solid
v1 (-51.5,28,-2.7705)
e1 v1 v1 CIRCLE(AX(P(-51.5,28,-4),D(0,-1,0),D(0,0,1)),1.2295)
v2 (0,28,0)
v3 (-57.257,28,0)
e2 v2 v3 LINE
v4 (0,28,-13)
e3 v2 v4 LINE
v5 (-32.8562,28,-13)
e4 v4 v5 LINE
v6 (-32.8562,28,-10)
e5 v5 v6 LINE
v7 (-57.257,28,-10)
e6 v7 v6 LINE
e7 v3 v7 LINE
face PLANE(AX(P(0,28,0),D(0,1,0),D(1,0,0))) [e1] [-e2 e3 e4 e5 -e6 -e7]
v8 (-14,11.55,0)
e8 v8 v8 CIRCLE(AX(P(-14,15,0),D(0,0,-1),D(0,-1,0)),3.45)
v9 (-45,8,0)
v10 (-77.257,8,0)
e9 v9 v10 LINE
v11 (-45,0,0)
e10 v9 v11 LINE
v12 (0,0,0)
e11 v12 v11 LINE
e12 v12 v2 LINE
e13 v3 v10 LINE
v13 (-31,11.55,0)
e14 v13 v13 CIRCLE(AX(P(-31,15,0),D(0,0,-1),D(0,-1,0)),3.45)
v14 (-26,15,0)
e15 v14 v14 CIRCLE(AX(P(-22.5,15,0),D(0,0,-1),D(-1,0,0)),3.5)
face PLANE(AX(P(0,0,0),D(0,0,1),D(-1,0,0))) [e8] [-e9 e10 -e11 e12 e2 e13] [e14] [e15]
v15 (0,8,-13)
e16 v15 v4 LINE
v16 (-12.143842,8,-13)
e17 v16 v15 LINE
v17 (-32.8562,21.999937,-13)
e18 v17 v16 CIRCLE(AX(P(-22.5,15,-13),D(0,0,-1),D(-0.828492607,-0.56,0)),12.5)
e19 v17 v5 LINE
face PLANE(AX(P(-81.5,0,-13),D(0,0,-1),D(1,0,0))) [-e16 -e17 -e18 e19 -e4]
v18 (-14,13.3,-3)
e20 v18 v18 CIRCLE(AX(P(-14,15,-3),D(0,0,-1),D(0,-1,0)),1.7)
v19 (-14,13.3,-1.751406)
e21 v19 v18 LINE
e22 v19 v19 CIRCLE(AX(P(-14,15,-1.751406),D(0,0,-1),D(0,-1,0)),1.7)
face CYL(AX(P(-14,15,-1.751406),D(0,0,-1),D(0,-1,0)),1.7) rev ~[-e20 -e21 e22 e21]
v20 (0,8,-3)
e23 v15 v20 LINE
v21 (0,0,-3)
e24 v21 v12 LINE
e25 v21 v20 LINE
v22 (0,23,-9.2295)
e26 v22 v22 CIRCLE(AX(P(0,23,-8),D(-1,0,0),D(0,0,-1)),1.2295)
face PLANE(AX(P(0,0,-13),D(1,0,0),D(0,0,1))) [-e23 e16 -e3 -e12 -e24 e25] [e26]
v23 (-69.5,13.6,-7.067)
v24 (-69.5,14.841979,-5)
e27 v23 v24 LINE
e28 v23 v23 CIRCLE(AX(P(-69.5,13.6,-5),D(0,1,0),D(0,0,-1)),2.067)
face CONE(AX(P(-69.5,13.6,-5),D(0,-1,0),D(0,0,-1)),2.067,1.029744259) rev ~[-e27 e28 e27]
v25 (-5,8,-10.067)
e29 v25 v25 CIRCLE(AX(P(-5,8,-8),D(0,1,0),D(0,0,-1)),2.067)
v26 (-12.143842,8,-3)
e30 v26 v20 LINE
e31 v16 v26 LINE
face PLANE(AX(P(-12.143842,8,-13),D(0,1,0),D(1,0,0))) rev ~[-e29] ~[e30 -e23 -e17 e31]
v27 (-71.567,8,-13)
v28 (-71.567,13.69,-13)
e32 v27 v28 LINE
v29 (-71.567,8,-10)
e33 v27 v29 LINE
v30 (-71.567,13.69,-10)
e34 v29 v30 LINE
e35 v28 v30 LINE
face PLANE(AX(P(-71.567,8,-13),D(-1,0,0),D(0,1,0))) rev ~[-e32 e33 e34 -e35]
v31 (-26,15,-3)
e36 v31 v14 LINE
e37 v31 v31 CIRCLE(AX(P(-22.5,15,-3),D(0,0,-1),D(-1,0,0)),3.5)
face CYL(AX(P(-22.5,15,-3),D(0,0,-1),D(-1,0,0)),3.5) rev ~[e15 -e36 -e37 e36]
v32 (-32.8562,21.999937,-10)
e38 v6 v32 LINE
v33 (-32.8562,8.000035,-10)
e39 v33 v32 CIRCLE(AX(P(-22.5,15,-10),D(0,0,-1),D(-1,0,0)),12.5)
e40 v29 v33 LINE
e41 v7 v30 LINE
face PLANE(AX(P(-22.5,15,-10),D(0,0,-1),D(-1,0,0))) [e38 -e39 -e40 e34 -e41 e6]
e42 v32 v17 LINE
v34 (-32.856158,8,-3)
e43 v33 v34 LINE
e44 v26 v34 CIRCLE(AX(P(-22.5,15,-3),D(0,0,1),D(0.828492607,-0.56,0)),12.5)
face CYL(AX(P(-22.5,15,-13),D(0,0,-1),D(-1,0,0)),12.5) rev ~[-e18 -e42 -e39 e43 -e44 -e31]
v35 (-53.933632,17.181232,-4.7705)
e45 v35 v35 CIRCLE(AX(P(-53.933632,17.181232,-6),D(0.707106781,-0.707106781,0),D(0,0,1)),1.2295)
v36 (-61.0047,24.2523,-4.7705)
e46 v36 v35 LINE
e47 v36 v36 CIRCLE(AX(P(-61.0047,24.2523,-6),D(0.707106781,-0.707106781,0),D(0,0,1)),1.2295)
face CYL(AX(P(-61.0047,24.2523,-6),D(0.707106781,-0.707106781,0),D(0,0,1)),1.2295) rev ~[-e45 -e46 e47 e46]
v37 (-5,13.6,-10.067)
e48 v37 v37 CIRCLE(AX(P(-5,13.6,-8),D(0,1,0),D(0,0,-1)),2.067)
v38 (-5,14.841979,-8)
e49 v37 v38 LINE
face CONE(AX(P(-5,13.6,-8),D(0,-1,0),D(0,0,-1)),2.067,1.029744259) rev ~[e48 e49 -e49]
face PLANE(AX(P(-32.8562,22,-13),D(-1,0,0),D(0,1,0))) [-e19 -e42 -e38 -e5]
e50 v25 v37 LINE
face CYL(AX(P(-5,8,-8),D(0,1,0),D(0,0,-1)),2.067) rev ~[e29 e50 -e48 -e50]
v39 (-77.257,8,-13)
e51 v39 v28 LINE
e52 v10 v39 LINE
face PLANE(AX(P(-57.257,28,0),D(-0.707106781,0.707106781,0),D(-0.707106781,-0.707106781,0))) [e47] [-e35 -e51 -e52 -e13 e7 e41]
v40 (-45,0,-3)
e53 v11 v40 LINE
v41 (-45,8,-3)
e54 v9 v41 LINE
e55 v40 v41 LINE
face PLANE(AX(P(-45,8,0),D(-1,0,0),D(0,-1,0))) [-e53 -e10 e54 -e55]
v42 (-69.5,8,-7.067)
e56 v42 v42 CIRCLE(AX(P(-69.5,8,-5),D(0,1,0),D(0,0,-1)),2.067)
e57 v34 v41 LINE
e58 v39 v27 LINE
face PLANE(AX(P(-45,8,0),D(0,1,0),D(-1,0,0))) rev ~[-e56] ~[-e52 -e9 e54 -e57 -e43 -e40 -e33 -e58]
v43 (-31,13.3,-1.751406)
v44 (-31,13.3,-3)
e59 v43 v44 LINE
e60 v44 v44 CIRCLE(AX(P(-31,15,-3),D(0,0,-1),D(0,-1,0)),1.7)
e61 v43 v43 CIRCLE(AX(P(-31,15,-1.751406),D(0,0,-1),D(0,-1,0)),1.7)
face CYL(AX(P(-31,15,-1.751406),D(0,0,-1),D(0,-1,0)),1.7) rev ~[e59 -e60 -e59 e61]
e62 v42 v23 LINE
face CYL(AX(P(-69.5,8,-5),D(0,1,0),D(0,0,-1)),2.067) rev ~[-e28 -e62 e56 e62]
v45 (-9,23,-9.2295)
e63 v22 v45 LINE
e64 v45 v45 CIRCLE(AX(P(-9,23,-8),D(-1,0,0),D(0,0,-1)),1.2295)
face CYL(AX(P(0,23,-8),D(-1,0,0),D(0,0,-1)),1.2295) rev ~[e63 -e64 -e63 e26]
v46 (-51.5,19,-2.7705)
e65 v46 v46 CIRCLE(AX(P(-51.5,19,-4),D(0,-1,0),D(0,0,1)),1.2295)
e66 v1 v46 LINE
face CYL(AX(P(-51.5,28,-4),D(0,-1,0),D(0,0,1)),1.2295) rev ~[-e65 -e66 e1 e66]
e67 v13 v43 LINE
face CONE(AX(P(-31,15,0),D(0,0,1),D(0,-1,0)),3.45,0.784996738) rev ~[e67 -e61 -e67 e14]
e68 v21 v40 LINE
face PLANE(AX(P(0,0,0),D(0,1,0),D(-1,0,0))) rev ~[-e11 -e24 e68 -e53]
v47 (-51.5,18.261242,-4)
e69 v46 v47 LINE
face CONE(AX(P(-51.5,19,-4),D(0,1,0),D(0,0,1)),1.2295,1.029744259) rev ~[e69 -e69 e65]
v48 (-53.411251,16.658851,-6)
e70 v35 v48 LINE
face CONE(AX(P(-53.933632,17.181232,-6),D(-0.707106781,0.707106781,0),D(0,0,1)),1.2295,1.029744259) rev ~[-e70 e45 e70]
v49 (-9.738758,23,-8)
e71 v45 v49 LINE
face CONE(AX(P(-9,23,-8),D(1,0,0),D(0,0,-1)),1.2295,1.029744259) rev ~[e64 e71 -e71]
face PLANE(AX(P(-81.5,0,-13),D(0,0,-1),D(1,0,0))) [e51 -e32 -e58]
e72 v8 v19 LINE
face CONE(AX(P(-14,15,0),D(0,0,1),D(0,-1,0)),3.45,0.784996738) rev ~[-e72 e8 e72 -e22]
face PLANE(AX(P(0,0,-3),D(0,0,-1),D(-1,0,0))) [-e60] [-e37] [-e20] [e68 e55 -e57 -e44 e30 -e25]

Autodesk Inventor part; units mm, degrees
ref_plane "YZ Plane" through (0, 0, 0) normal (1, 0, 0) x (0, 1, 0)
ref_plane "XZ Plane" through (0, 0, 0) normal (0, 1, 0) x (-1, 0, 0)
ref_plane "XY Plane" through (0, 0, 0) normal (0, 0, 1) x (1, 0, 0)
sketch "Sketch1" plane through (0, 0, 0) normal (0, 1, 0) x (-1, 0, 0)
  line L0 (0, 0) -> (81.5, 0)
  line L1 (81.5, 0) -> (81.5, -13)
  line L2 (81.5, -13) -> (0, -13)
  line L3 (0, -13) -> (0, 0)
  dimension "d0" = 81.5
  dimension "d1" = 13
extrude "Extrusion1" add sketch "Sketch1" along normal blind 30
sketch "Sketch2" plane through (0, 0, -13) normal (0, 0, -1) x (-1, 0, 0)
  line L0 (0, 0) -> (0, 30) projected
  line L1 (0, 0) -> (81.5086, 0)
  line L2 (81.5086, 0) -> (81.5086, 8)
  line L3 (81.5086, 8) -> (0, 8)
  line L4 (0, 8) -> (0, 0)
  line L5 (81.5, 0) -> (81.5, 30) projected
  line L6 (81.5, 0) -> (22.5, 0)
  line L7 (0, 0) -> (81.5, 0) projected
  line L8 (22.5, 0) -> (22.5, 15)
  circle A0 centre (22.5, 15) radius 12.5
  dimension "d4" = 81.5086
  dimension "d5" = 8
  dimension "d6" = 59
  dimension "d7" = 15
  dimension "d8" = 25
extrude "Extrusion2" cut sketch "Sketch2" against normal blind 10
sketch "Sketch3" plane through (-81.5, 0, 0) normal (0, 0, 1) x (1, 0, 0)
  line L0 (0, 8) -> (0, 30) projected
  line L1 (0, 30) -> (0, 8)
  line L2 (0, 30) -> (22, 30)
  line L3 (0, 30) -> (81.5, 30) projected
  line L4 (22, 30) -> (0, 8)
  line L5 (81.5, 0) -> (81.5, 8) projected
  line L6 (81.5, 0) -> (36.5, 0)
  line L7 (0, 0) -> (81.5, 0) projected
  line L8 (48.6438, 8) -> (0, 8) projected
  line L9 (36.5, 0) -> (0, 0)
  line L10 (0, 0) -> (0, 8)
  line L11 (0, 8) -> (36.5, 8)
  line L12 (36.5, 8) -> (36.5, 0)
  dimension "d11" = 22
  dimension "d12" = 45
extrude "Extrusion3" cut sketch "Sketch3" against normal blind 13
sketch "Sketch4" plane through (0, 30, 0) normal (0, 1, 0) x (1, 0, 0)
  line L0 (0, 0) -> (0, 13) projected
  line L1 (-59.5, 0) -> (-81.5, 0) projected
  line L2 (0, 13) -> (-81.5, 13)
  line L3 (-81.5, 13) -> (-81.5, 0)
  line L4 (-81.5, 0) -> (0, 0)
  line L5 (0, 0) -> (0, 13)
extrude "Extrusion4" cut sketch "Sketch4" against normal blind 2
sketch "Sketch6" plane through (0, 0, -3) normal (0, 0, -1) x (-1, 0, 0)
  arc A0 (32.8562, 8) -> (12.1438, 8) centre (22.5, 15) ccw projected
  circle A1 centre (22.5, 15) radius 3.5
  point P0 (0, 0)
  dimension "d17" = 7
extrude "Extrusion5" cut sketch "Sketch6" against normal blind 3
sketch "Sketch7" plane through (-45, 0, 0) normal (0, 0, 1) x (1, 0, 0)
  circle A0 centre (22.5, 15) radius 3.5 projected
  line L0 (22.5, 15) -> (31, 15)
  line L1 (22.5, 15) -> (14, 15)
  point P0 (45, 0)
  dimension "d20" = 8.5
  dimension "d21" = 8.5
hole "Hole1" at (-14, 15, 0) at (-31, 15, 0) direction (0, 0, -1) diameter 3.4 end through all countersink diameter 6.9 countersink angle 89.954 clearance for "Countersunk Flat Head Screw ISO 2009/7046" size "M3" standard "ISO"
sketch "Sketch8" plane through (-32.8562, 8, -13) normal (0, -1, 0) x (1, 0, 0)
  line L0 (0, 0) -> (-48.6438, 0) projected
  line L1 (-48.6438, 0) -> (-36.6438, 0)
  line L2 (-36.6438, 0) -> (-36.6438, 8)
  line L3 (32.8562, 10) -> (32.8562, 0) projected
  line L4 (32.8562, 0) -> (32.8562, 5)
  line L5 (32.8562, 5) -> (27.8562, 5)
  point P0 (32.8562, 13)
  dimension "d82" = 8
  dimension "d83" = 5
  dimension "d84" = 5
hole "Hole2" at (-5, 8, -8) at (-69.5, 8, -5) direction (0, 1, 0) diameter 4.134 depth 5.6 tip angle 118 thread size "M5x0.8" class "6H" standard "ISO Metric profile"
sketch "Sketch9" plane through (0, 0, 0) normal (1, 0, 0) x (0, 0, -1)
  line L0 (8, 28) -> (8, 23)
  line L1 (0, 28) -> (13, 28) projected
  line L2 (8, 28) -> (13, 28)
  point P0 (0, 0)
  point P1 (13, 8)
  dimension "d40" = 5
hole "Hole3" at (0, 23, -8) direction (-1, 0, 0) diameter 2.459 depth 9 tip angle 118 thread size "M3x0.5" class "6H" standard "ISO Metric profile"
sketch "Sketch10" plane through (0, 28, 0) normal (0, 1, 0) x (1, 0, 0)
  line L0 (-61.5, 0) -> (-61.5, 13) projected
  line L1 (-61.5, 0) -> (-61.5, 4)
  line L2 (-61.5, 4) -> (-51.5, 4)
  point P0 (0, 0)
  dimension "d76" = 4
  dimension "d77" = 10
hole "Hole4" at (-51.5, 28, -4) direction (0, -1, 0) diameter 2.459 depth 9 tip angle 118 thread size "M3x0.5" class "6H" standard "ISO Metric profile"
sketch "Sketch12" plane through (-45, 0, 0) normal (0, 0, 1) x (1, 0, 0)
  line L0 (12.1438, 8) -> (-36.5, 8) projected
  line L1 (-36.5, 8) -> (-33.5, 8)
  line L2 (-16.5, 28) -> (45, 28) projected
  line L3 (-16.5, 28) -> (-13.5, 28)
  line L4 (-13.5, 28) -> (-33.5, 8)
  line L5 (-36.5, 8) -> (-16.5, 28)
  line L6 (-13.5, 28) -> (-12.257, 28)
  line L7 (45, 28) -> (-16.5, 28) projected
  line L8 (-12.257, 28) -> (-32.257, 8)
  line L9 (-33.5, 8) -> (-32.257, 8)
  point P0 (45, 0)
  dimension "d71" = 3
  dimension "d72" = 3
  dimension "d75" = 1.243
extrude "Extrusion6" cut sketch "Sketch12" against normal blind 25.4
sketch "Sketch13" plane through (-22.5, 15, -13) normal (0, 0, -1) x (-1, 0, 0)
  line L0 (10.3562, -7) -> (54.757, -7) projected
  line L1 (10.3562, -7) -> (47.3562, -7)
  line L2 (47.3562, -7) -> (47.3562, 0.4008)
  line L3 (34.757, 13) -> (54.757, -7) projected
  line L4 (34.757, 13) -> (-22.5, 13) projected
  line L5 (47.3562, 0.4008) -> (34.757, 13)
  line L6 (34.757, 13) -> (10.3562, 13)
  arc A0 (10.3562, -7) -> (-10.3562, -7) centre (0, 0) ccw projected
  line L7 (10.3562, -7) -> (10.3562, 13)
  line L8 (49.067, -7) -> (44.933, -7) projected
  line L9 (47.3562, -7) -> (49.067, -7)
  line L10 (49.067, -7) -> (49.067, -1.31)
  line L11 (47.3562, 0.4008) -> (49.067, -1.31)
  line L12 (54.757, -7) -> (34.757, 13) projected
  point P0 (-22.5, -15)
  dimension "d79" = 37
extrude "Extrusion7" cut sketch "Sketch13" against normal blind 3 contours A0 L7 L4 L3 L2 L0 | L7 A0 | L2 L3 L10 L0
sketch "Sketch11" plane through (-79.3785, 5.8785, -13) normal (-0.7071068, 0.7071068, 0) x (-0.7071068, -0.7071068, 0)
  line L0 (-31.2845, 3) -> (-31.2845, 13) projected
  line L1 (-3.0003, 0) -> (-11.0471, 0) projected
  point P0 (-51.9723, 13)
  point P1 (-25.9845, 7)
  dimension "d111" = 5.3
  dimension "d112" = 7
hole "Hole5" at (-61.0047, 24.2523, -6) direction (0.7071068, -0.7071068, 0) diameter 2.459 depth 10 tip angle 118 thread size "M3x0.5" class "6H" standard "ISO Metric profile"
properties part number "mocowanie_silnika_wariant1"
